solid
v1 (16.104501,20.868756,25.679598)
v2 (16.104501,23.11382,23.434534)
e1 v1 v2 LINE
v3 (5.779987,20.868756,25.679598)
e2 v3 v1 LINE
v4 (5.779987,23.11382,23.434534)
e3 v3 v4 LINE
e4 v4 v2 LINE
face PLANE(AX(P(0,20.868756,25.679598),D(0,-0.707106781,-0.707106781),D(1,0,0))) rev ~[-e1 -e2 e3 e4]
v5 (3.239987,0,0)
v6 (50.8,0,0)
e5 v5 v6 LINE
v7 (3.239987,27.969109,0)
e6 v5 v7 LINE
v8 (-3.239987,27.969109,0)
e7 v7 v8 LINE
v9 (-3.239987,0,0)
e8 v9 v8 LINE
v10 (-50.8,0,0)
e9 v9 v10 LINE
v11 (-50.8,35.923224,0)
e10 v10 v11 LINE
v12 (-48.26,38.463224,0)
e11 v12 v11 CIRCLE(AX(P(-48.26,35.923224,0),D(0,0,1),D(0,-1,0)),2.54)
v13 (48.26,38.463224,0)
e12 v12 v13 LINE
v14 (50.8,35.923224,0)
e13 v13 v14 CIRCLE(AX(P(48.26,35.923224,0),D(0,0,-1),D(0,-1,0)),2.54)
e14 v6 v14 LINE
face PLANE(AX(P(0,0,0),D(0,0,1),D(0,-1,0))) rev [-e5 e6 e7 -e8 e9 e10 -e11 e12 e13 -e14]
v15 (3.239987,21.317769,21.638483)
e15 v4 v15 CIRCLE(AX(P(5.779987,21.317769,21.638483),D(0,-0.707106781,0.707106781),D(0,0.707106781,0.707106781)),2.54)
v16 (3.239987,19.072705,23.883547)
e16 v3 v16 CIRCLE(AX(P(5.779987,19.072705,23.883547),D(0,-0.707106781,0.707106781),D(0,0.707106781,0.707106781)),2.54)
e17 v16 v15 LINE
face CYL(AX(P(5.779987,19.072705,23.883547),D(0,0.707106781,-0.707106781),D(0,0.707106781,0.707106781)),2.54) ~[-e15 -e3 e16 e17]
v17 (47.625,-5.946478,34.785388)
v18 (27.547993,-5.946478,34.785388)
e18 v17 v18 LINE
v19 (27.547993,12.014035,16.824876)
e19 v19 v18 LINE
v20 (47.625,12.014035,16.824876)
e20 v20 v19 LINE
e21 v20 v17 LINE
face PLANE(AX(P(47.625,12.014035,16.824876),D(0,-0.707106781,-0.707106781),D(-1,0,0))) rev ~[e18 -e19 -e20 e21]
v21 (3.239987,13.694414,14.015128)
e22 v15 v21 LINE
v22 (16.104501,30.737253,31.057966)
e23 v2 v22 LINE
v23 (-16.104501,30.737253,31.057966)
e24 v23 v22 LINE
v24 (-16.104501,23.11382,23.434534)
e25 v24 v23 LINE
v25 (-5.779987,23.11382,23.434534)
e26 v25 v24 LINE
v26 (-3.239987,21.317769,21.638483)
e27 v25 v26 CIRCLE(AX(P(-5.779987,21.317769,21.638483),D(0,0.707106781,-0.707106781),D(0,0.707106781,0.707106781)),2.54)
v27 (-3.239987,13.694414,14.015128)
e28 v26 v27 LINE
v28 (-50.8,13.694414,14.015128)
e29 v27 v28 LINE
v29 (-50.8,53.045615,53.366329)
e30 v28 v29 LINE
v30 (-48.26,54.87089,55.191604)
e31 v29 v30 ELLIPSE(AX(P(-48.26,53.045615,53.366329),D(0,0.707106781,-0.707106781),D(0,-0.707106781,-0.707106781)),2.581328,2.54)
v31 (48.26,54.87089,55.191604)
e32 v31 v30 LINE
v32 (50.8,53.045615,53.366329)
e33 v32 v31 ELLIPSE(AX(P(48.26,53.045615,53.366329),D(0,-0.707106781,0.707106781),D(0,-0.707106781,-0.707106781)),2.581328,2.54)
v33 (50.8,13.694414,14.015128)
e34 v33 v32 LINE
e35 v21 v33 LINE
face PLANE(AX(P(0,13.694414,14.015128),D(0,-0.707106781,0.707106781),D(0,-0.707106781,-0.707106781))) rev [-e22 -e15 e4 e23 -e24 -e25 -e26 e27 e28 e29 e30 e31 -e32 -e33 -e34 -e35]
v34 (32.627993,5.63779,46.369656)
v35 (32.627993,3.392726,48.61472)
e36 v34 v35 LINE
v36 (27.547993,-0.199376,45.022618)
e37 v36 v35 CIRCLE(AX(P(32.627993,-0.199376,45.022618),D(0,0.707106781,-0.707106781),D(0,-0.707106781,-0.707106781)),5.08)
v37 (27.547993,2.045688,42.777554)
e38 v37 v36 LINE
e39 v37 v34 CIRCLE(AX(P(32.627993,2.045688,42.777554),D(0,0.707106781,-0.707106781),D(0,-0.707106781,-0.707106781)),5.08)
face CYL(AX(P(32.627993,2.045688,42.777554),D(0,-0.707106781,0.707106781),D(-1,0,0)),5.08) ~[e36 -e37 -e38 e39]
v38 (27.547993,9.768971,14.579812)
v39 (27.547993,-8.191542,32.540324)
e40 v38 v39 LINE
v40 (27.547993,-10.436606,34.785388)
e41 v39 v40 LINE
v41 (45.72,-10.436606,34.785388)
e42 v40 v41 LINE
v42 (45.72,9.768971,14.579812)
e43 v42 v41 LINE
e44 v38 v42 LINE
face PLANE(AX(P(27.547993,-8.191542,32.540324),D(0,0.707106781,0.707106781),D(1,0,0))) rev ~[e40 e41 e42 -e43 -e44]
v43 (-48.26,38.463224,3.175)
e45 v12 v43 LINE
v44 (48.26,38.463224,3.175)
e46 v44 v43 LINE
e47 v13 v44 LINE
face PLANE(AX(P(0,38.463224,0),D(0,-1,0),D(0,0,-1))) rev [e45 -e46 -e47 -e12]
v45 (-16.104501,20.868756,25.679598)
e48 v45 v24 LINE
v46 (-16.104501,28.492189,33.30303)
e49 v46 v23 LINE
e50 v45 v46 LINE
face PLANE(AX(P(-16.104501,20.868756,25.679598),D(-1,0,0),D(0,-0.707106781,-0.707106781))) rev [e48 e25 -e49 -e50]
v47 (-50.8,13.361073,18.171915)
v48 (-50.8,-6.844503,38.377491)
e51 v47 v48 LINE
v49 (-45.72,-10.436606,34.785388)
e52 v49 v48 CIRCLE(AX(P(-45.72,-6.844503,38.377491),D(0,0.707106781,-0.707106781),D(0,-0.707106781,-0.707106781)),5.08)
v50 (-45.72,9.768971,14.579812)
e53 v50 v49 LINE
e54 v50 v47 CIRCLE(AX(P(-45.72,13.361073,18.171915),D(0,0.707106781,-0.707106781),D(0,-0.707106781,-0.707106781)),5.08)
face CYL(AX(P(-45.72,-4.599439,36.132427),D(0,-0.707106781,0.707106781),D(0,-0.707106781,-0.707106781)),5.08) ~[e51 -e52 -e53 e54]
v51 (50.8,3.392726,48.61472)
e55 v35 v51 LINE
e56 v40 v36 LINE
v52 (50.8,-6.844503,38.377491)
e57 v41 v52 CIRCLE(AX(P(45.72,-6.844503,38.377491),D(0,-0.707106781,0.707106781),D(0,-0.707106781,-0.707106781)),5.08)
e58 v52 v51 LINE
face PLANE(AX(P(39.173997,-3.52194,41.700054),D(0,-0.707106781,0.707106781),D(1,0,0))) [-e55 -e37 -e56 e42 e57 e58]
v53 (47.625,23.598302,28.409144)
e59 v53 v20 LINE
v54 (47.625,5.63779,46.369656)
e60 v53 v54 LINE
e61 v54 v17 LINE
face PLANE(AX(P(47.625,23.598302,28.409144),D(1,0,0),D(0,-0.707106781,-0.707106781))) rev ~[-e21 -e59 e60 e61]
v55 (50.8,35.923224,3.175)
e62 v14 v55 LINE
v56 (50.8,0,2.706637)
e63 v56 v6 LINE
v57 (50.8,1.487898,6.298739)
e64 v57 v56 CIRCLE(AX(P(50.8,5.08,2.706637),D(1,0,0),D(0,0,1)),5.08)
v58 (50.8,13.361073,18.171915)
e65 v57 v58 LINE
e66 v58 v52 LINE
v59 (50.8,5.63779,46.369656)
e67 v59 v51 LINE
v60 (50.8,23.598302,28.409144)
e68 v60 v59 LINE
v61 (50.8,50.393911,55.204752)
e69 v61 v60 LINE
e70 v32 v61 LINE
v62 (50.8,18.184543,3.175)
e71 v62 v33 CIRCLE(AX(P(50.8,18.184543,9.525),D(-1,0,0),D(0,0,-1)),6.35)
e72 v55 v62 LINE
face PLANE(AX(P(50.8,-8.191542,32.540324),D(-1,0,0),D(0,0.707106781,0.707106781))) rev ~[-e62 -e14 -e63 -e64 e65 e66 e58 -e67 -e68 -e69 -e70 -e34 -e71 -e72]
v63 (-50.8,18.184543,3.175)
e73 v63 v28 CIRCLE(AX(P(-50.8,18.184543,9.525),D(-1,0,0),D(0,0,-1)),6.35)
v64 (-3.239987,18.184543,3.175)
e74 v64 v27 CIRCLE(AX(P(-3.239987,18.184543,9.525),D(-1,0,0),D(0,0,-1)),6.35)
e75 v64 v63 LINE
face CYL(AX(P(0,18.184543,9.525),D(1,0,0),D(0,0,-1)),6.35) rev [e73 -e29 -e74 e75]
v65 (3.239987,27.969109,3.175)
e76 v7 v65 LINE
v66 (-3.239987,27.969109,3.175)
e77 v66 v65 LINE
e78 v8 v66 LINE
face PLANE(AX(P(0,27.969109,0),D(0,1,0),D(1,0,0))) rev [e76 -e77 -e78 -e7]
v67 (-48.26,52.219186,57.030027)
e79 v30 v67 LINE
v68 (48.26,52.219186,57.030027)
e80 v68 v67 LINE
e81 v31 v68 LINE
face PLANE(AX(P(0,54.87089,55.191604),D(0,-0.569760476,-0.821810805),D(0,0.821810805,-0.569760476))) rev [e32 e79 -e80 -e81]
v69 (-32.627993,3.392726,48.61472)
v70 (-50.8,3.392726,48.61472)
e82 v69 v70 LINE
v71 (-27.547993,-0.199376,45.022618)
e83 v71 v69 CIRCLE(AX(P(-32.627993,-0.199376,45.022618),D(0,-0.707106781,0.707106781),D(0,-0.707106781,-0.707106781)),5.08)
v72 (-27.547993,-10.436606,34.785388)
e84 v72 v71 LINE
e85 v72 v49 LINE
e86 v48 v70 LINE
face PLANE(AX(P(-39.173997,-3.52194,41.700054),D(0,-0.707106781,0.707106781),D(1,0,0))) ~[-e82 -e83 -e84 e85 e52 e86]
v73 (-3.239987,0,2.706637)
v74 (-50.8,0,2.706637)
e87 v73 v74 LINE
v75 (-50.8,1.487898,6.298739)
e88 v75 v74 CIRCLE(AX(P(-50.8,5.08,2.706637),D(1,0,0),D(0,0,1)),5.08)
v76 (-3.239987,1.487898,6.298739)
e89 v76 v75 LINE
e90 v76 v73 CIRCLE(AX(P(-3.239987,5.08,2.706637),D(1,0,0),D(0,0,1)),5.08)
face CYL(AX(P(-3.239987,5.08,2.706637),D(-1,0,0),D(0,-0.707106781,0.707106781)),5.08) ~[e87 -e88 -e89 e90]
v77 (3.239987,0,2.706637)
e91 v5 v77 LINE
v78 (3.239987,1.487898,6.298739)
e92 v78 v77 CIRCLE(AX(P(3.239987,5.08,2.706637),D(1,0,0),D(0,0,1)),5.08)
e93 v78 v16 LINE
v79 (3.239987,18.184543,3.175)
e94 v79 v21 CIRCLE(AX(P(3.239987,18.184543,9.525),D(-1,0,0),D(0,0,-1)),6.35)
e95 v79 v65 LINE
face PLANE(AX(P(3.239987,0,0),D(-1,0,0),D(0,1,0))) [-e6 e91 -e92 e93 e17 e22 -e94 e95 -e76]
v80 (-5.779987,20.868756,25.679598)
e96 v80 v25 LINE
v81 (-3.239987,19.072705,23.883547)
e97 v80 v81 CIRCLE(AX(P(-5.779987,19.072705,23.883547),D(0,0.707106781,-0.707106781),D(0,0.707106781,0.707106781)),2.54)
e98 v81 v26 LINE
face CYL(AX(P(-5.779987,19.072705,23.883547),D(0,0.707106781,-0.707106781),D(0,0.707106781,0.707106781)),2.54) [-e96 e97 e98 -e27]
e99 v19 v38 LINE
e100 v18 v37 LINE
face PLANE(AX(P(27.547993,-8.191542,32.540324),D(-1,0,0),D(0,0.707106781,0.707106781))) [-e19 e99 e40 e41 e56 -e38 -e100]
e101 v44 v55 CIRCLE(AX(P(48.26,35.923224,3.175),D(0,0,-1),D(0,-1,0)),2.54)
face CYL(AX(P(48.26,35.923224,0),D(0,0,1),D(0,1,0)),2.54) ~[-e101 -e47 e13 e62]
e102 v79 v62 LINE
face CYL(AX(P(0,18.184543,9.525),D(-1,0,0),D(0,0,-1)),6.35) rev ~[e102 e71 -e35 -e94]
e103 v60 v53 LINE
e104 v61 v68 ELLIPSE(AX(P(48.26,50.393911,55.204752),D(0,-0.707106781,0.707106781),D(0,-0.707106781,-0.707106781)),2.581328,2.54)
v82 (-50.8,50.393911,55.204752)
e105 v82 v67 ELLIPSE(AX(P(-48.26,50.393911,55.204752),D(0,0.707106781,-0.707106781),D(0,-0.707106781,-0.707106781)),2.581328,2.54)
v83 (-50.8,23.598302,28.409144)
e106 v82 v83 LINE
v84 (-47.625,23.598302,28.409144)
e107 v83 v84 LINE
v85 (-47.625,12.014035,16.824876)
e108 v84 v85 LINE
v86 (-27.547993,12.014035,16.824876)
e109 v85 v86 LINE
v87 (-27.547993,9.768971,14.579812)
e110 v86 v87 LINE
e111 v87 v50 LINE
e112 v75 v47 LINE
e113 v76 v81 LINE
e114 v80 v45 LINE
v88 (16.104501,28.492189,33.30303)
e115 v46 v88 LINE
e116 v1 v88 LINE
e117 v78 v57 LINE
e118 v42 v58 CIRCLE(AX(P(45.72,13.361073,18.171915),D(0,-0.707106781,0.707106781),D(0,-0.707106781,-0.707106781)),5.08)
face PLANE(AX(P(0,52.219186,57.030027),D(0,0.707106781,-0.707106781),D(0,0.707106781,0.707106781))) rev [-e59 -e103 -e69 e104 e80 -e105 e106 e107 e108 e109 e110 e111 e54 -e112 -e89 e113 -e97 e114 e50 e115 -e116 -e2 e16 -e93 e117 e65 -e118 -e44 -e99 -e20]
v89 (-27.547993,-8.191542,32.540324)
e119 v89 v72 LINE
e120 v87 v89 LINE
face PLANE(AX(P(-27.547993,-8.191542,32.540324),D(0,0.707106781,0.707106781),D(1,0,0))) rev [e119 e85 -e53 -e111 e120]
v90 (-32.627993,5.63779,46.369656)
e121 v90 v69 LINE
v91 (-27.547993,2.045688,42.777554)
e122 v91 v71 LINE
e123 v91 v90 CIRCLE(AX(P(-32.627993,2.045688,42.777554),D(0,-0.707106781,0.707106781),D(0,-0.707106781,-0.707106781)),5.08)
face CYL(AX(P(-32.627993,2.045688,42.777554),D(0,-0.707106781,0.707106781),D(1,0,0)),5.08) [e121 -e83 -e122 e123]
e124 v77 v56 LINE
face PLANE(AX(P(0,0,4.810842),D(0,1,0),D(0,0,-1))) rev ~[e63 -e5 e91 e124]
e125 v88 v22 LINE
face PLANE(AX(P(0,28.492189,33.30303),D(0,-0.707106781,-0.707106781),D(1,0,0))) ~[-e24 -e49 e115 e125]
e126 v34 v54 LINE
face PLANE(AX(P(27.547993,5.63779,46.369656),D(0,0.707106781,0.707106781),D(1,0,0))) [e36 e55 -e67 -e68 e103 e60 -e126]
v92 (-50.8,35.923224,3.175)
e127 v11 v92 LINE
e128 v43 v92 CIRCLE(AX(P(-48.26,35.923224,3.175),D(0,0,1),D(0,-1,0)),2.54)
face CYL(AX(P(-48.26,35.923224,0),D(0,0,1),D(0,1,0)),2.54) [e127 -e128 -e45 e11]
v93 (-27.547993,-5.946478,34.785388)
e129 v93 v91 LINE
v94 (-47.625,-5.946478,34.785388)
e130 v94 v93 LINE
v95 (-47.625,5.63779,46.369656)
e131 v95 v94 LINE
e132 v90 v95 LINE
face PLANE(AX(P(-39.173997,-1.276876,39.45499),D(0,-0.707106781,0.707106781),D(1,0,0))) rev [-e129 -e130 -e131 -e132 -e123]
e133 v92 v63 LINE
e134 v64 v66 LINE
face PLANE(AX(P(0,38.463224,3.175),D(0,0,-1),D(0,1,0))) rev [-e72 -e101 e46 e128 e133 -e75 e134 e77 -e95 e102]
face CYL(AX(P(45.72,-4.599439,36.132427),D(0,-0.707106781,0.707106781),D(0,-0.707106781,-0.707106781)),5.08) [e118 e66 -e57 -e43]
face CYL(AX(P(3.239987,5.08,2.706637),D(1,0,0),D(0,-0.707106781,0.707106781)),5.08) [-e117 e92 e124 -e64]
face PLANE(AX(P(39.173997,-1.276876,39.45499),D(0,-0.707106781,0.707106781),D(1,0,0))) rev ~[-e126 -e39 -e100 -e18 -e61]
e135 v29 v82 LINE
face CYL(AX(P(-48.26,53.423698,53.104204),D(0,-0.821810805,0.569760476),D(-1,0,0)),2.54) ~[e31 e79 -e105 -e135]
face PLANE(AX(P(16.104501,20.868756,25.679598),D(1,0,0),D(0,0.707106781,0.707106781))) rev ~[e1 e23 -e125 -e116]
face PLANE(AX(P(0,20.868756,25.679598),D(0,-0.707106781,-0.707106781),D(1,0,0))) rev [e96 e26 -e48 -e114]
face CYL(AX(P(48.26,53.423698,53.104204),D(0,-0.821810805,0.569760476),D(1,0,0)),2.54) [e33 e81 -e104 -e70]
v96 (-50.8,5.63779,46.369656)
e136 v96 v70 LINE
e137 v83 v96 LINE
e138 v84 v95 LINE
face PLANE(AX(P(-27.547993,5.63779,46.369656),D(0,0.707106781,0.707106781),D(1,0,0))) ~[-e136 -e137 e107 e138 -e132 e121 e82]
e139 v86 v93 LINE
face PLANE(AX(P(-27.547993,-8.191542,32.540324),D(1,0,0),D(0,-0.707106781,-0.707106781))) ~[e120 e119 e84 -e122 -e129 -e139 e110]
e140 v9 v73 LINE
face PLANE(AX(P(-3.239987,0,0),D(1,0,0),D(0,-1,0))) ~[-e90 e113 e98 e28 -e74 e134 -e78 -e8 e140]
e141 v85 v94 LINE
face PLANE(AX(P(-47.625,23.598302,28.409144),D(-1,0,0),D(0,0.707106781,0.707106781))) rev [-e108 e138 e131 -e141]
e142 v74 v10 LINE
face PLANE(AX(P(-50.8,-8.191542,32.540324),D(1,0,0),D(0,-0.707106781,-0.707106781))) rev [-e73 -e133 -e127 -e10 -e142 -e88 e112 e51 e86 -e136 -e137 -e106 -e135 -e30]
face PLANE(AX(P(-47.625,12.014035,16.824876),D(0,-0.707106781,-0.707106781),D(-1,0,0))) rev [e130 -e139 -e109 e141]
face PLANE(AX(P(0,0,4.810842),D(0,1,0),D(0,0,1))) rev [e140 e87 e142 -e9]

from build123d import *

# Parameters (mm, degrees)
F1_DEPTH = 50.8
F3_DEPTH = 25.4
F4_W     = 16.1045007408
F4_H     = 10.7811614871
F5_DEPTH = 3.175
F6_W     = 3.2399867196
F6_H     = 27.9691088945
F7_REACH = 85.1871733106
F8_W     = 23.2520068914
F8_H     = 19.5576284379
F9_DEPTH = 3.175
F10_R    = 5.08
F11_R    = 2.54


with BuildPart() as f1:
    # F0 (on Right) → F1 (new body)
    with BuildSketch(Plane.YZ):
        with BuildLine():
            Line((0, 0), (38.4632237256, 0))
            Line((38.4632237256, 0), (38.4632237256, 3.175))
            Line((38.4632237256, 3.175), (18.1845425574, 3.175))
            ThreePointArc((18.1845425574, 3.175), (12.3179075259, 7.0949602045), (13.6944144968, 14.0151280605))
            Line((13.6944144968, 14.0151280605), (54.8708899793, 55.191603543))
            Line((54.8708899793, 55.191603543), (52.2191855315, 57.0300271557))
            Line((52.2191855315, 57.0300271557), (0, 4.8108416242))
            Line((0, 4.8108416242), (0, 0))
        make_face()
    extrude(amount=F1_DEPTH)

    # F2 (on face) → F3 (join)
    with BuildSketch(Plane(origin=(0, -2.4054208121, 2.4054208121), x_dir=(1, 0, 0), z_dir=(0, -0.7071067812, 0.7071067812))):
        Polygon((27.5479931086, 17.2171894163), (50.8, 17.2171894163), (50.8, 36.7748178542), (47.625, 36.7748178542), (47.625, 20.3921894163), (27.5479931086, 20.3921894163), align=None)
    extrude(amount=F3_DEPTH)

    # F4 (on face) → F5 (cut, through all)
    with BuildSketch(Plane(origin=(0, -2.4054208121, 2.4054208121), x_dir=(1, 0, 0), z_dir=(0, -0.7071067812, 0.7071067812))):
        with Locations((8.0522503704, 38.3052378893)):
            Rectangle(F4_W, F4_H)
    extrude(amount=-F5_DEPTH, mode=Mode.SUBTRACT)

    f7_end = Plane(origin=(8.0522503704, 21.9912884712, 24.5570660652), x_dir=(0, 0.7071067812, -0.7071067812), z_dir=(0, 0.7071067812, 0.7071067812))
    # F6 (on Top) → F7 (cut, up to a plane its end follows)
    with BuildSketch(Plane.XY):
        with Locations((1.6199933598, 13.9845544472)):
            Rectangle(F6_W, F6_H)
    f7_long = extrude(amount=F7_REACH, mode=Mode.PRIVATE)
    add(split(f7_long, bisect_by=f7_end, keep=Keep.BOTTOM, mode=Mode.PRIVATE), mode=Mode.SUBTRACT)

    # F8 (on face) → F9 (join)
    with BuildSketch(Plane(origin=(0, -20.3659330543, 20.3659330543), x_dir=(1, 0, 0), z_dir=(0, -0.7071067812, 0.7071067812))):
        with Locations((39.1739965543, 26.9960036352)):
            Rectangle(F8_W, F8_H)
    extrude(amount=F9_DEPTH)

    # F10
    f10_edges = [f1.edges().sort_by_distance(p)[0] for p in [
        (27.019993, 0, 4.810842),
        (50.8, -0.333818, 24.6826),
        (27.547993, 4.515258, 47.492188),
    ]]
    fillet(f10_edges, radius=F10_R)

    # F11
    f11_edges = [f1.edges().sort_by_distance(p)[0] for p in [
        (50.8, 53.545038, 56.110815),
        (50.8, 38.463224, 1.5875),
        (3.239987, 21.991288, 24.557066),
    ]]
    fillet(f11_edges, radius=F11_R)

    # F12: F1 across plane


with BuildPart() as f1_1:
    add(f1.part)
    add(f1.part.mirror(Plane.YZ))


solid = f1_1.part
